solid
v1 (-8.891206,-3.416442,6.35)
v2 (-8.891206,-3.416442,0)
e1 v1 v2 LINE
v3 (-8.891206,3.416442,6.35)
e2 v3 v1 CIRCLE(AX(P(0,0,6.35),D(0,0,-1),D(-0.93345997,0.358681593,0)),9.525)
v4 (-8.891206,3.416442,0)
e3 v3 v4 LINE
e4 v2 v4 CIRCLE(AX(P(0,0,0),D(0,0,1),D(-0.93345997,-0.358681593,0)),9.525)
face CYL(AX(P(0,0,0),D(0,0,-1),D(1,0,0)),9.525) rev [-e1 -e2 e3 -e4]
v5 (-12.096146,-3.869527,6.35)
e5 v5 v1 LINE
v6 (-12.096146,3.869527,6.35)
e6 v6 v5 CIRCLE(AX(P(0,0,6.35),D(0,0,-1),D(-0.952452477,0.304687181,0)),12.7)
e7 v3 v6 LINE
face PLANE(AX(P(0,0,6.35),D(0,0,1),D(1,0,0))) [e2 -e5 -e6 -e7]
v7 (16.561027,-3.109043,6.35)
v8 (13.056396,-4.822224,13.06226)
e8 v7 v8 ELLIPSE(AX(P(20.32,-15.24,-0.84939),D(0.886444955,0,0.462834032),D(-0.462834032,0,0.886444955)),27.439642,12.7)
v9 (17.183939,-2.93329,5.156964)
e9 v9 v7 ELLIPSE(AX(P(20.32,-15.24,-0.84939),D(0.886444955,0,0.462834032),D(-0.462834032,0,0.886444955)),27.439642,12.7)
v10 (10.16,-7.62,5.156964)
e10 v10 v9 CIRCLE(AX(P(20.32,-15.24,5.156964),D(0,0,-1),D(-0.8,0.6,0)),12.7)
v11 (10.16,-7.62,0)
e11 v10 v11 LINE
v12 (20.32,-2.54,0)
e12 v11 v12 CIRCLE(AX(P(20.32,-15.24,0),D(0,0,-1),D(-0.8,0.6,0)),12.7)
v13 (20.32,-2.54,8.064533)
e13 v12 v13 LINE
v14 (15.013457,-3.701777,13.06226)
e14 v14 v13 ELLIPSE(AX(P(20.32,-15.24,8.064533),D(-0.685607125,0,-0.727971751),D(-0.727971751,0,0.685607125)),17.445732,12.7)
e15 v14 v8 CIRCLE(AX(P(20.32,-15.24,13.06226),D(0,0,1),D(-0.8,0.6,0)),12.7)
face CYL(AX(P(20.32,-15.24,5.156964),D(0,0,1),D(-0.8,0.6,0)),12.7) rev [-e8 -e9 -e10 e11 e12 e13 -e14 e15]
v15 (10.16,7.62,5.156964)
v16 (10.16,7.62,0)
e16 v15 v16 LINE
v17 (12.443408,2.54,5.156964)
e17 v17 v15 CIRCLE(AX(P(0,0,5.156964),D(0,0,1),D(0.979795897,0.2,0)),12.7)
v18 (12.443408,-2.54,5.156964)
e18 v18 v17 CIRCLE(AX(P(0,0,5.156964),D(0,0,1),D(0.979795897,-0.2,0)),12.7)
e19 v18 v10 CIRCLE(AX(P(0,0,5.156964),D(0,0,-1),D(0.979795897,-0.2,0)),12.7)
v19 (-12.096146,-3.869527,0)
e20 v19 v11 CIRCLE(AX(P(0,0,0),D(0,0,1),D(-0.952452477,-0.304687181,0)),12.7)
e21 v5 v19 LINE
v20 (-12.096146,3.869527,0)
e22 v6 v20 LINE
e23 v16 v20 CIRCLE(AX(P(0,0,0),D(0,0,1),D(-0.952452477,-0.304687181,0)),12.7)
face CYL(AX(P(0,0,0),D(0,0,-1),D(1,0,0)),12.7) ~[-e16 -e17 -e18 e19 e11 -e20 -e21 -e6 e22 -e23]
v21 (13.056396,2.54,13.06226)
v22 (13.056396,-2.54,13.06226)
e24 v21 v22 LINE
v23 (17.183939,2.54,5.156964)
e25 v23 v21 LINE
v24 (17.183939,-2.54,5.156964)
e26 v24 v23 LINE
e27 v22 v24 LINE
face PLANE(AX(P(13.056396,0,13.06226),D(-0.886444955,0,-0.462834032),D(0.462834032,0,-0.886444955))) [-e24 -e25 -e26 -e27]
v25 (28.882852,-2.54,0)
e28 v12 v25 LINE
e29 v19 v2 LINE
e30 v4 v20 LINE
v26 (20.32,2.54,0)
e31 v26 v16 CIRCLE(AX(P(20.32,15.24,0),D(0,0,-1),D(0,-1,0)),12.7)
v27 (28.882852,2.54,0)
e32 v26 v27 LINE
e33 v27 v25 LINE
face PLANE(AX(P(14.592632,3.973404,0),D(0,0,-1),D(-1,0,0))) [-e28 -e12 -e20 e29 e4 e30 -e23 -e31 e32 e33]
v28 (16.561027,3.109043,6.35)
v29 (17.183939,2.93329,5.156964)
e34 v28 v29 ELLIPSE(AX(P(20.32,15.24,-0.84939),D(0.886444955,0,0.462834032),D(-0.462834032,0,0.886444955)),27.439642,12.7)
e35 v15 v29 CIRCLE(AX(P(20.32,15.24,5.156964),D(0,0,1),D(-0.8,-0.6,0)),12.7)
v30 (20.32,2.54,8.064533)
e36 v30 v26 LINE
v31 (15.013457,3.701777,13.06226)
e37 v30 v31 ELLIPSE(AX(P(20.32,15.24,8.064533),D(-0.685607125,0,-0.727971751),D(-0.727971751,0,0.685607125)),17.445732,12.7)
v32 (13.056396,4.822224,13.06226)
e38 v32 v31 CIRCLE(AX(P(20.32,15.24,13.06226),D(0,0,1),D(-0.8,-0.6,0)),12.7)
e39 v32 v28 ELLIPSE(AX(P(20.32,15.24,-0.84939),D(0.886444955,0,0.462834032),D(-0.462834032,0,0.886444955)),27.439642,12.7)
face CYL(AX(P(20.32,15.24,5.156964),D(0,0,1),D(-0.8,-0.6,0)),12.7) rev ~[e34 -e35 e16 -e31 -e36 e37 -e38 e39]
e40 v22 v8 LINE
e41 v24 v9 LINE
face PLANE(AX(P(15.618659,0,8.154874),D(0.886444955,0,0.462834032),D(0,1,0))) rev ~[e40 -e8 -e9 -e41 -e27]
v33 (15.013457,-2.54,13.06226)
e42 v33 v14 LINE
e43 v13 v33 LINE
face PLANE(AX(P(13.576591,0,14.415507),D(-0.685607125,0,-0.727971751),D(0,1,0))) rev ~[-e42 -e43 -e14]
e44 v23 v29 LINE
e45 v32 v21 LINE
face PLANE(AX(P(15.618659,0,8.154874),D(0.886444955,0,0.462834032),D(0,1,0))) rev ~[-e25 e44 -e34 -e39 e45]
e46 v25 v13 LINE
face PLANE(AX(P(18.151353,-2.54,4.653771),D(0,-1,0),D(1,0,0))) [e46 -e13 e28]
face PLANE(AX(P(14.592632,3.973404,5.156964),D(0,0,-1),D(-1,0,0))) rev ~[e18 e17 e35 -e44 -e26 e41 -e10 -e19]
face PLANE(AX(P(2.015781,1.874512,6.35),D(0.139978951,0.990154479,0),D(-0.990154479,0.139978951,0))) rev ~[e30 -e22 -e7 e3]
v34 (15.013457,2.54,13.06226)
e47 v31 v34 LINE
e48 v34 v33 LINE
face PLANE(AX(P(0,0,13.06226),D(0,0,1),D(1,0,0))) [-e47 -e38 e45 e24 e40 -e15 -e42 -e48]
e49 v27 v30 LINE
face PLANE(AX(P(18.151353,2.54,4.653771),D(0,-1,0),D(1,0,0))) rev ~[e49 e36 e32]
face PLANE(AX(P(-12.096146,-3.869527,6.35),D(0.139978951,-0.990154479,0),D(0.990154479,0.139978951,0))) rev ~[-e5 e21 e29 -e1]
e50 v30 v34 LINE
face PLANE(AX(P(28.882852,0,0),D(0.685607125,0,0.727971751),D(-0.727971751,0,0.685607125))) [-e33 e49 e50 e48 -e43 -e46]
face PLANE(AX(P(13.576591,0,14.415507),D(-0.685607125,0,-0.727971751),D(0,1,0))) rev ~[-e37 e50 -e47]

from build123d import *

# Parameters (mm, degrees)
F0_R          = 12.7
F0_R_2        = 9.525
F2_DEPTH      = 6.35
F4_DEPTH      = 25.4
F6_DEPTH      = 2.54
F6_DEPTH_BACK = 2.54
F7_T4_DEPTH   = 24.8484443303
F7_T12_DEPTH  = 24.8484443303
F7_T19_DEPTH  = 5.1569640636
F7_T24_DEPTH  = 5.1569640636
F8_T4_DEPTH   = 24.8484443303
F8_T12_DEPTH  = 24.8484443303
F8_T19_DEPTH  = 5.1569640636
F8_T24_DEPTH  = 5.1569640636


# Not quite as in the source:
# - a fillet or chamfer that OpenCascade refuses, or shapes differently, is made with other operations: its cross-section is extruded or revolved along the edge and cut away or added


with BuildPart() as f2:
    # F0 (on Top) → F2 (new body)
    with BuildSketch(Plane.XY):
        Circle(F0_R)
        Circle(F0_R_2, mode=Mode.SUBTRACT)
    extrude(amount=F2_DEPTH)

    # F3 (on face) → F4 (cut)
    with BuildSketch(Plane.XY.offset(6.35)):
        with BuildLine():
            Line((2.0157811232, 1.8745124225), (-12.0961464615, 3.8695272039))
            ThreePointArc((-12.0961464615, 3.8695272039), (-12.7, 0), (-12.0961464615, -3.8695272039))
            Line((-12.0961464615, -3.8695272039), (2.0157811232, -1.8745124225))
            Line((2.0157811232, -1.8745124225), (2.0157811232, 1.8745124225))
        make_face()
    extrude(amount=-F4_DEPTH, mode=Mode.SUBTRACT)

    # F5 (on Front) → F6 (join, two sides)
    with BuildSketch(Plane.XZ) as f6_sk:
        Polygon((10.5609930441, 5.1569640636), (10.7068819925, 0), (28.8828521035, 0), (15.0134566239, 13.0622601137), (13.0563958547, 13.0622601137), (17.1839392743, 5.1569640636), align=None)
    extrude(amount=F6_DEPTH)
    extrude(f6_sk.sketch, amount=-F6_DEPTH_BACK)

    # F7: fillet of radius 12.7 on 1 edges, made by hand


with BuildPart() as f7_tool2:
    # F7_s3 → F7_t4 (new body)
    with BuildSketch(Plane.XY.offset(24.8484443303)):
        with BuildLine():
            ThreePointArc((10.16, -7.62), (14.6403873372, -3.8807746743), (20.32, -2.54))
            Line((20.32, -2.54), (12.4434078933, -2.54))
            ThreePointArc((12.4434078933, -2.54), (11.5836139481, -5.206715654), (10.16, -7.62))
        make_face()
    extrude(amount=-F7_T4_DEPTH)

    split(bisect_by=Plane.XY.offset(6.35), keep=Keep.TOP)

    split(bisect_by=Plane(origin=(15.6186590558, 0, 8.1548740238), x_dir=(0, 1, 0), z_dir=(0.8864449555, 0, 0.4628340317)), keep=Keep.TOP)

    split(bisect_by=Plane.XY.offset(13.0622601137), keep=Keep.BOTTOM)

    split(bisect_by=Plane(origin=(13.5765905704, 0, 14.4155071364), x_dir=(0, 1, 0), z_dir=(-0.6856071252, 0, -0.7279717507)), keep=Keep.TOP)


with BuildPart() as f2_1:
    add(f2.part)

    # F7_t1: union F7_tool2
    add(f7_tool2.part)


with BuildPart() as f7_tool10:
    # F7_s11 → F7_t12 (new body)
    with BuildSketch(Plane.XY.offset(24.8484443303)):
        with BuildLine():
            ThreePointArc((10.16, -7.62), (14.6403873372, -3.8807746743), (20.32, -2.54))
            Line((20.32, -2.54), (12.4434078933, -2.54))
            ThreePointArc((12.4434078933, -2.54), (11.5836139481, -5.206715654), (10.16, -7.62))
        make_face()
    extrude(amount=-F7_T12_DEPTH)

    split(bisect_by=Plane.XY.offset(5.1569640636), keep=Keep.TOP)

    split(bisect_by=Plane.XY.offset(6.35), keep=Keep.BOTTOM)

    split(bisect_by=Plane(origin=(15.6186590558, 0, 8.1548740238), x_dir=(0, 1, 0), z_dir=(0.8864449555, 0, 0.4628340317)), keep=Keep.TOP)


with BuildPart() as f2_2:
    add(f2_1.part)

    # F7_t9: union F7_tool10
    add(f7_tool10.part)


with BuildPart() as f7_tool17:
    # F7_s18 → F7_t19 (new body)
    with BuildSketch(Plane.XY.offset(5.1569640636)):
        with BuildLine():
            ThreePointArc((10.16, -7.62), (14.6403873372, -3.8807746743), (20.32, -2.54))
            Line((20.32, -2.54), (12.4434078933, -2.54))
            ThreePointArc((12.4434078933, -2.54), (11.5836139481, -5.206715654), (10.16, -7.62))
        make_face()
    extrude(amount=-F7_T19_DEPTH)

    split(bisect_by=Plane(origin=(15.6186590558, 0, 8.1548740238), x_dir=(0, 1, 0), z_dir=(0.8864449555, 0, 0.4628340317)), keep=Keep.TOP)


with BuildPart() as f2_3:
    add(f2_2.part)

    # F7_t16: union F7_tool17
    add(f7_tool17.part)


with BuildPart() as f7_tool22:
    # F7_s23 → F7_t24 (new body)
    with BuildSketch(Plane.XY.offset(5.1569640636)):
        with BuildLine():
            ThreePointArc((10.16, -7.62), (14.6403873372, -3.8807746743), (20.32, -2.54))
            Line((20.32, -2.54), (12.4434078933, -2.54))
            ThreePointArc((12.4434078933, -2.54), (11.5836139481, -5.206715654), (10.16, -7.62))
        make_face()
    extrude(amount=-F7_T24_DEPTH)

    split(bisect_by=Plane(origin=(15.6186590558, 0, 8.1548740238), x_dir=(0, 1, 0), z_dir=(-0.8864449555, 0, -0.4628340317)), keep=Keep.TOP)


with BuildPart() as f2_4:
    add(f2_3.part)

    # F7_t21: union F7_tool22
    add(f7_tool22.part)

    # F8: fillet of radius 12.7 on 1 edges, made by hand


with BuildPart() as f8_tool2:
    # F8_s3 → F8_t4 (new body)
    with BuildSketch(Plane.XY.offset(24.8484443303)):
        with BuildLine():
            ThreePointArc((10.16, 7.62), (14.6403873372, 3.8807746743), (20.32, 2.54))
            Line((20.32, 2.54), (12.4434078933, 2.54))
            ThreePointArc((12.4434078933, 2.54), (11.5836139481, 5.206715654), (10.16, 7.62))
        make_face()
    extrude(amount=-F8_T4_DEPTH)

    split(bisect_by=Plane.XY.offset(6.35), keep=Keep.TOP)

    split(bisect_by=Plane(origin=(15.6186590558, 0, 8.1548740238), x_dir=(0, 1, 0), z_dir=(0.8864449555, 0, 0.4628340317)), keep=Keep.TOP)

    split(bisect_by=Plane.XY.offset(13.0622601137), keep=Keep.BOTTOM)

    split(bisect_by=Plane(origin=(13.5765905704, 0, 14.4155071364), x_dir=(0, 1, 0), z_dir=(-0.6856071252, 0, -0.7279717507)), keep=Keep.TOP)


with BuildPart() as f2_5:
    add(f2_4.part)

    # F8_t1: union F8_tool2
    add(f8_tool2.part)


with BuildPart() as f8_tool10:
    # F8_s11 → F8_t12 (new body)
    with BuildSketch(Plane.XY.offset(24.8484443303)):
        with BuildLine():
            ThreePointArc((10.16, 7.62), (14.6403873372, 3.8807746743), (20.32, 2.54))
            Line((20.32, 2.54), (12.4434078933, 2.54))
            ThreePointArc((12.4434078933, 2.54), (11.5836139481, 5.206715654), (10.16, 7.62))
        make_face()
    extrude(amount=-F8_T12_DEPTH)

    split(bisect_by=Plane.XY.offset(5.1569640636), keep=Keep.TOP)

    split(bisect_by=Plane.XY.offset(6.35), keep=Keep.BOTTOM)

    split(bisect_by=Plane(origin=(15.6186590558, 0, 8.1548740238), x_dir=(0, 1, 0), z_dir=(0.8864449555, 0, 0.4628340317)), keep=Keep.TOP)


with BuildPart() as f2_6:
    add(f2_5.part)

    # F8_t9: union F8_tool10
    add(f8_tool10.part)


with BuildPart() as f8_tool17:
    # F8_s18 → F8_t19 (new body)
    with BuildSketch(Plane.XY.offset(5.1569640636)):
        with BuildLine():
            ThreePointArc((10.16, 7.62), (14.6403873372, 3.8807746743), (20.32, 2.54))
            Line((20.32, 2.54), (12.4434078933, 2.54))
            ThreePointArc((12.4434078933, 2.54), (11.5836139481, 5.206715654), (10.16, 7.62))
        make_face()
    extrude(amount=-F8_T19_DEPTH)

    split(bisect_by=Plane(origin=(15.6186590558, 0, 8.1548740238), x_dir=(0, 1, 0), z_dir=(0.8864449555, 0, 0.4628340317)), keep=Keep.TOP)


with BuildPart() as f2_7:
    add(f2_6.part)

    # F8_t16: union F8_tool17
    add(f8_tool17.part)


with BuildPart() as f8_tool22:
    # F8_s23 → F8_t24 (new body)
    with BuildSketch(Plane.XY.offset(5.1569640636)):
        with BuildLine():
            ThreePointArc((10.16, 7.62), (14.6403873372, 3.8807746743), (20.32, 2.54))
            Line((20.32, 2.54), (12.4434078933, 2.54))
            ThreePointArc((12.4434078933, 2.54), (11.5836139481, 5.206715654), (10.16, 7.62))
        make_face()
    extrude(amount=-F8_T24_DEPTH)

    split(bisect_by=Plane(origin=(15.6186590558, 0, 8.1548740238), x_dir=(0, 1, 0), z_dir=(-0.8864449555, 0, -0.4628340317)), keep=Keep.TOP)


with BuildPart() as f2_8:
    add(f2_7.part)

    # F8_t21: union F8_tool22
    add(f8_tool22.part)


solid = f2_8.part
